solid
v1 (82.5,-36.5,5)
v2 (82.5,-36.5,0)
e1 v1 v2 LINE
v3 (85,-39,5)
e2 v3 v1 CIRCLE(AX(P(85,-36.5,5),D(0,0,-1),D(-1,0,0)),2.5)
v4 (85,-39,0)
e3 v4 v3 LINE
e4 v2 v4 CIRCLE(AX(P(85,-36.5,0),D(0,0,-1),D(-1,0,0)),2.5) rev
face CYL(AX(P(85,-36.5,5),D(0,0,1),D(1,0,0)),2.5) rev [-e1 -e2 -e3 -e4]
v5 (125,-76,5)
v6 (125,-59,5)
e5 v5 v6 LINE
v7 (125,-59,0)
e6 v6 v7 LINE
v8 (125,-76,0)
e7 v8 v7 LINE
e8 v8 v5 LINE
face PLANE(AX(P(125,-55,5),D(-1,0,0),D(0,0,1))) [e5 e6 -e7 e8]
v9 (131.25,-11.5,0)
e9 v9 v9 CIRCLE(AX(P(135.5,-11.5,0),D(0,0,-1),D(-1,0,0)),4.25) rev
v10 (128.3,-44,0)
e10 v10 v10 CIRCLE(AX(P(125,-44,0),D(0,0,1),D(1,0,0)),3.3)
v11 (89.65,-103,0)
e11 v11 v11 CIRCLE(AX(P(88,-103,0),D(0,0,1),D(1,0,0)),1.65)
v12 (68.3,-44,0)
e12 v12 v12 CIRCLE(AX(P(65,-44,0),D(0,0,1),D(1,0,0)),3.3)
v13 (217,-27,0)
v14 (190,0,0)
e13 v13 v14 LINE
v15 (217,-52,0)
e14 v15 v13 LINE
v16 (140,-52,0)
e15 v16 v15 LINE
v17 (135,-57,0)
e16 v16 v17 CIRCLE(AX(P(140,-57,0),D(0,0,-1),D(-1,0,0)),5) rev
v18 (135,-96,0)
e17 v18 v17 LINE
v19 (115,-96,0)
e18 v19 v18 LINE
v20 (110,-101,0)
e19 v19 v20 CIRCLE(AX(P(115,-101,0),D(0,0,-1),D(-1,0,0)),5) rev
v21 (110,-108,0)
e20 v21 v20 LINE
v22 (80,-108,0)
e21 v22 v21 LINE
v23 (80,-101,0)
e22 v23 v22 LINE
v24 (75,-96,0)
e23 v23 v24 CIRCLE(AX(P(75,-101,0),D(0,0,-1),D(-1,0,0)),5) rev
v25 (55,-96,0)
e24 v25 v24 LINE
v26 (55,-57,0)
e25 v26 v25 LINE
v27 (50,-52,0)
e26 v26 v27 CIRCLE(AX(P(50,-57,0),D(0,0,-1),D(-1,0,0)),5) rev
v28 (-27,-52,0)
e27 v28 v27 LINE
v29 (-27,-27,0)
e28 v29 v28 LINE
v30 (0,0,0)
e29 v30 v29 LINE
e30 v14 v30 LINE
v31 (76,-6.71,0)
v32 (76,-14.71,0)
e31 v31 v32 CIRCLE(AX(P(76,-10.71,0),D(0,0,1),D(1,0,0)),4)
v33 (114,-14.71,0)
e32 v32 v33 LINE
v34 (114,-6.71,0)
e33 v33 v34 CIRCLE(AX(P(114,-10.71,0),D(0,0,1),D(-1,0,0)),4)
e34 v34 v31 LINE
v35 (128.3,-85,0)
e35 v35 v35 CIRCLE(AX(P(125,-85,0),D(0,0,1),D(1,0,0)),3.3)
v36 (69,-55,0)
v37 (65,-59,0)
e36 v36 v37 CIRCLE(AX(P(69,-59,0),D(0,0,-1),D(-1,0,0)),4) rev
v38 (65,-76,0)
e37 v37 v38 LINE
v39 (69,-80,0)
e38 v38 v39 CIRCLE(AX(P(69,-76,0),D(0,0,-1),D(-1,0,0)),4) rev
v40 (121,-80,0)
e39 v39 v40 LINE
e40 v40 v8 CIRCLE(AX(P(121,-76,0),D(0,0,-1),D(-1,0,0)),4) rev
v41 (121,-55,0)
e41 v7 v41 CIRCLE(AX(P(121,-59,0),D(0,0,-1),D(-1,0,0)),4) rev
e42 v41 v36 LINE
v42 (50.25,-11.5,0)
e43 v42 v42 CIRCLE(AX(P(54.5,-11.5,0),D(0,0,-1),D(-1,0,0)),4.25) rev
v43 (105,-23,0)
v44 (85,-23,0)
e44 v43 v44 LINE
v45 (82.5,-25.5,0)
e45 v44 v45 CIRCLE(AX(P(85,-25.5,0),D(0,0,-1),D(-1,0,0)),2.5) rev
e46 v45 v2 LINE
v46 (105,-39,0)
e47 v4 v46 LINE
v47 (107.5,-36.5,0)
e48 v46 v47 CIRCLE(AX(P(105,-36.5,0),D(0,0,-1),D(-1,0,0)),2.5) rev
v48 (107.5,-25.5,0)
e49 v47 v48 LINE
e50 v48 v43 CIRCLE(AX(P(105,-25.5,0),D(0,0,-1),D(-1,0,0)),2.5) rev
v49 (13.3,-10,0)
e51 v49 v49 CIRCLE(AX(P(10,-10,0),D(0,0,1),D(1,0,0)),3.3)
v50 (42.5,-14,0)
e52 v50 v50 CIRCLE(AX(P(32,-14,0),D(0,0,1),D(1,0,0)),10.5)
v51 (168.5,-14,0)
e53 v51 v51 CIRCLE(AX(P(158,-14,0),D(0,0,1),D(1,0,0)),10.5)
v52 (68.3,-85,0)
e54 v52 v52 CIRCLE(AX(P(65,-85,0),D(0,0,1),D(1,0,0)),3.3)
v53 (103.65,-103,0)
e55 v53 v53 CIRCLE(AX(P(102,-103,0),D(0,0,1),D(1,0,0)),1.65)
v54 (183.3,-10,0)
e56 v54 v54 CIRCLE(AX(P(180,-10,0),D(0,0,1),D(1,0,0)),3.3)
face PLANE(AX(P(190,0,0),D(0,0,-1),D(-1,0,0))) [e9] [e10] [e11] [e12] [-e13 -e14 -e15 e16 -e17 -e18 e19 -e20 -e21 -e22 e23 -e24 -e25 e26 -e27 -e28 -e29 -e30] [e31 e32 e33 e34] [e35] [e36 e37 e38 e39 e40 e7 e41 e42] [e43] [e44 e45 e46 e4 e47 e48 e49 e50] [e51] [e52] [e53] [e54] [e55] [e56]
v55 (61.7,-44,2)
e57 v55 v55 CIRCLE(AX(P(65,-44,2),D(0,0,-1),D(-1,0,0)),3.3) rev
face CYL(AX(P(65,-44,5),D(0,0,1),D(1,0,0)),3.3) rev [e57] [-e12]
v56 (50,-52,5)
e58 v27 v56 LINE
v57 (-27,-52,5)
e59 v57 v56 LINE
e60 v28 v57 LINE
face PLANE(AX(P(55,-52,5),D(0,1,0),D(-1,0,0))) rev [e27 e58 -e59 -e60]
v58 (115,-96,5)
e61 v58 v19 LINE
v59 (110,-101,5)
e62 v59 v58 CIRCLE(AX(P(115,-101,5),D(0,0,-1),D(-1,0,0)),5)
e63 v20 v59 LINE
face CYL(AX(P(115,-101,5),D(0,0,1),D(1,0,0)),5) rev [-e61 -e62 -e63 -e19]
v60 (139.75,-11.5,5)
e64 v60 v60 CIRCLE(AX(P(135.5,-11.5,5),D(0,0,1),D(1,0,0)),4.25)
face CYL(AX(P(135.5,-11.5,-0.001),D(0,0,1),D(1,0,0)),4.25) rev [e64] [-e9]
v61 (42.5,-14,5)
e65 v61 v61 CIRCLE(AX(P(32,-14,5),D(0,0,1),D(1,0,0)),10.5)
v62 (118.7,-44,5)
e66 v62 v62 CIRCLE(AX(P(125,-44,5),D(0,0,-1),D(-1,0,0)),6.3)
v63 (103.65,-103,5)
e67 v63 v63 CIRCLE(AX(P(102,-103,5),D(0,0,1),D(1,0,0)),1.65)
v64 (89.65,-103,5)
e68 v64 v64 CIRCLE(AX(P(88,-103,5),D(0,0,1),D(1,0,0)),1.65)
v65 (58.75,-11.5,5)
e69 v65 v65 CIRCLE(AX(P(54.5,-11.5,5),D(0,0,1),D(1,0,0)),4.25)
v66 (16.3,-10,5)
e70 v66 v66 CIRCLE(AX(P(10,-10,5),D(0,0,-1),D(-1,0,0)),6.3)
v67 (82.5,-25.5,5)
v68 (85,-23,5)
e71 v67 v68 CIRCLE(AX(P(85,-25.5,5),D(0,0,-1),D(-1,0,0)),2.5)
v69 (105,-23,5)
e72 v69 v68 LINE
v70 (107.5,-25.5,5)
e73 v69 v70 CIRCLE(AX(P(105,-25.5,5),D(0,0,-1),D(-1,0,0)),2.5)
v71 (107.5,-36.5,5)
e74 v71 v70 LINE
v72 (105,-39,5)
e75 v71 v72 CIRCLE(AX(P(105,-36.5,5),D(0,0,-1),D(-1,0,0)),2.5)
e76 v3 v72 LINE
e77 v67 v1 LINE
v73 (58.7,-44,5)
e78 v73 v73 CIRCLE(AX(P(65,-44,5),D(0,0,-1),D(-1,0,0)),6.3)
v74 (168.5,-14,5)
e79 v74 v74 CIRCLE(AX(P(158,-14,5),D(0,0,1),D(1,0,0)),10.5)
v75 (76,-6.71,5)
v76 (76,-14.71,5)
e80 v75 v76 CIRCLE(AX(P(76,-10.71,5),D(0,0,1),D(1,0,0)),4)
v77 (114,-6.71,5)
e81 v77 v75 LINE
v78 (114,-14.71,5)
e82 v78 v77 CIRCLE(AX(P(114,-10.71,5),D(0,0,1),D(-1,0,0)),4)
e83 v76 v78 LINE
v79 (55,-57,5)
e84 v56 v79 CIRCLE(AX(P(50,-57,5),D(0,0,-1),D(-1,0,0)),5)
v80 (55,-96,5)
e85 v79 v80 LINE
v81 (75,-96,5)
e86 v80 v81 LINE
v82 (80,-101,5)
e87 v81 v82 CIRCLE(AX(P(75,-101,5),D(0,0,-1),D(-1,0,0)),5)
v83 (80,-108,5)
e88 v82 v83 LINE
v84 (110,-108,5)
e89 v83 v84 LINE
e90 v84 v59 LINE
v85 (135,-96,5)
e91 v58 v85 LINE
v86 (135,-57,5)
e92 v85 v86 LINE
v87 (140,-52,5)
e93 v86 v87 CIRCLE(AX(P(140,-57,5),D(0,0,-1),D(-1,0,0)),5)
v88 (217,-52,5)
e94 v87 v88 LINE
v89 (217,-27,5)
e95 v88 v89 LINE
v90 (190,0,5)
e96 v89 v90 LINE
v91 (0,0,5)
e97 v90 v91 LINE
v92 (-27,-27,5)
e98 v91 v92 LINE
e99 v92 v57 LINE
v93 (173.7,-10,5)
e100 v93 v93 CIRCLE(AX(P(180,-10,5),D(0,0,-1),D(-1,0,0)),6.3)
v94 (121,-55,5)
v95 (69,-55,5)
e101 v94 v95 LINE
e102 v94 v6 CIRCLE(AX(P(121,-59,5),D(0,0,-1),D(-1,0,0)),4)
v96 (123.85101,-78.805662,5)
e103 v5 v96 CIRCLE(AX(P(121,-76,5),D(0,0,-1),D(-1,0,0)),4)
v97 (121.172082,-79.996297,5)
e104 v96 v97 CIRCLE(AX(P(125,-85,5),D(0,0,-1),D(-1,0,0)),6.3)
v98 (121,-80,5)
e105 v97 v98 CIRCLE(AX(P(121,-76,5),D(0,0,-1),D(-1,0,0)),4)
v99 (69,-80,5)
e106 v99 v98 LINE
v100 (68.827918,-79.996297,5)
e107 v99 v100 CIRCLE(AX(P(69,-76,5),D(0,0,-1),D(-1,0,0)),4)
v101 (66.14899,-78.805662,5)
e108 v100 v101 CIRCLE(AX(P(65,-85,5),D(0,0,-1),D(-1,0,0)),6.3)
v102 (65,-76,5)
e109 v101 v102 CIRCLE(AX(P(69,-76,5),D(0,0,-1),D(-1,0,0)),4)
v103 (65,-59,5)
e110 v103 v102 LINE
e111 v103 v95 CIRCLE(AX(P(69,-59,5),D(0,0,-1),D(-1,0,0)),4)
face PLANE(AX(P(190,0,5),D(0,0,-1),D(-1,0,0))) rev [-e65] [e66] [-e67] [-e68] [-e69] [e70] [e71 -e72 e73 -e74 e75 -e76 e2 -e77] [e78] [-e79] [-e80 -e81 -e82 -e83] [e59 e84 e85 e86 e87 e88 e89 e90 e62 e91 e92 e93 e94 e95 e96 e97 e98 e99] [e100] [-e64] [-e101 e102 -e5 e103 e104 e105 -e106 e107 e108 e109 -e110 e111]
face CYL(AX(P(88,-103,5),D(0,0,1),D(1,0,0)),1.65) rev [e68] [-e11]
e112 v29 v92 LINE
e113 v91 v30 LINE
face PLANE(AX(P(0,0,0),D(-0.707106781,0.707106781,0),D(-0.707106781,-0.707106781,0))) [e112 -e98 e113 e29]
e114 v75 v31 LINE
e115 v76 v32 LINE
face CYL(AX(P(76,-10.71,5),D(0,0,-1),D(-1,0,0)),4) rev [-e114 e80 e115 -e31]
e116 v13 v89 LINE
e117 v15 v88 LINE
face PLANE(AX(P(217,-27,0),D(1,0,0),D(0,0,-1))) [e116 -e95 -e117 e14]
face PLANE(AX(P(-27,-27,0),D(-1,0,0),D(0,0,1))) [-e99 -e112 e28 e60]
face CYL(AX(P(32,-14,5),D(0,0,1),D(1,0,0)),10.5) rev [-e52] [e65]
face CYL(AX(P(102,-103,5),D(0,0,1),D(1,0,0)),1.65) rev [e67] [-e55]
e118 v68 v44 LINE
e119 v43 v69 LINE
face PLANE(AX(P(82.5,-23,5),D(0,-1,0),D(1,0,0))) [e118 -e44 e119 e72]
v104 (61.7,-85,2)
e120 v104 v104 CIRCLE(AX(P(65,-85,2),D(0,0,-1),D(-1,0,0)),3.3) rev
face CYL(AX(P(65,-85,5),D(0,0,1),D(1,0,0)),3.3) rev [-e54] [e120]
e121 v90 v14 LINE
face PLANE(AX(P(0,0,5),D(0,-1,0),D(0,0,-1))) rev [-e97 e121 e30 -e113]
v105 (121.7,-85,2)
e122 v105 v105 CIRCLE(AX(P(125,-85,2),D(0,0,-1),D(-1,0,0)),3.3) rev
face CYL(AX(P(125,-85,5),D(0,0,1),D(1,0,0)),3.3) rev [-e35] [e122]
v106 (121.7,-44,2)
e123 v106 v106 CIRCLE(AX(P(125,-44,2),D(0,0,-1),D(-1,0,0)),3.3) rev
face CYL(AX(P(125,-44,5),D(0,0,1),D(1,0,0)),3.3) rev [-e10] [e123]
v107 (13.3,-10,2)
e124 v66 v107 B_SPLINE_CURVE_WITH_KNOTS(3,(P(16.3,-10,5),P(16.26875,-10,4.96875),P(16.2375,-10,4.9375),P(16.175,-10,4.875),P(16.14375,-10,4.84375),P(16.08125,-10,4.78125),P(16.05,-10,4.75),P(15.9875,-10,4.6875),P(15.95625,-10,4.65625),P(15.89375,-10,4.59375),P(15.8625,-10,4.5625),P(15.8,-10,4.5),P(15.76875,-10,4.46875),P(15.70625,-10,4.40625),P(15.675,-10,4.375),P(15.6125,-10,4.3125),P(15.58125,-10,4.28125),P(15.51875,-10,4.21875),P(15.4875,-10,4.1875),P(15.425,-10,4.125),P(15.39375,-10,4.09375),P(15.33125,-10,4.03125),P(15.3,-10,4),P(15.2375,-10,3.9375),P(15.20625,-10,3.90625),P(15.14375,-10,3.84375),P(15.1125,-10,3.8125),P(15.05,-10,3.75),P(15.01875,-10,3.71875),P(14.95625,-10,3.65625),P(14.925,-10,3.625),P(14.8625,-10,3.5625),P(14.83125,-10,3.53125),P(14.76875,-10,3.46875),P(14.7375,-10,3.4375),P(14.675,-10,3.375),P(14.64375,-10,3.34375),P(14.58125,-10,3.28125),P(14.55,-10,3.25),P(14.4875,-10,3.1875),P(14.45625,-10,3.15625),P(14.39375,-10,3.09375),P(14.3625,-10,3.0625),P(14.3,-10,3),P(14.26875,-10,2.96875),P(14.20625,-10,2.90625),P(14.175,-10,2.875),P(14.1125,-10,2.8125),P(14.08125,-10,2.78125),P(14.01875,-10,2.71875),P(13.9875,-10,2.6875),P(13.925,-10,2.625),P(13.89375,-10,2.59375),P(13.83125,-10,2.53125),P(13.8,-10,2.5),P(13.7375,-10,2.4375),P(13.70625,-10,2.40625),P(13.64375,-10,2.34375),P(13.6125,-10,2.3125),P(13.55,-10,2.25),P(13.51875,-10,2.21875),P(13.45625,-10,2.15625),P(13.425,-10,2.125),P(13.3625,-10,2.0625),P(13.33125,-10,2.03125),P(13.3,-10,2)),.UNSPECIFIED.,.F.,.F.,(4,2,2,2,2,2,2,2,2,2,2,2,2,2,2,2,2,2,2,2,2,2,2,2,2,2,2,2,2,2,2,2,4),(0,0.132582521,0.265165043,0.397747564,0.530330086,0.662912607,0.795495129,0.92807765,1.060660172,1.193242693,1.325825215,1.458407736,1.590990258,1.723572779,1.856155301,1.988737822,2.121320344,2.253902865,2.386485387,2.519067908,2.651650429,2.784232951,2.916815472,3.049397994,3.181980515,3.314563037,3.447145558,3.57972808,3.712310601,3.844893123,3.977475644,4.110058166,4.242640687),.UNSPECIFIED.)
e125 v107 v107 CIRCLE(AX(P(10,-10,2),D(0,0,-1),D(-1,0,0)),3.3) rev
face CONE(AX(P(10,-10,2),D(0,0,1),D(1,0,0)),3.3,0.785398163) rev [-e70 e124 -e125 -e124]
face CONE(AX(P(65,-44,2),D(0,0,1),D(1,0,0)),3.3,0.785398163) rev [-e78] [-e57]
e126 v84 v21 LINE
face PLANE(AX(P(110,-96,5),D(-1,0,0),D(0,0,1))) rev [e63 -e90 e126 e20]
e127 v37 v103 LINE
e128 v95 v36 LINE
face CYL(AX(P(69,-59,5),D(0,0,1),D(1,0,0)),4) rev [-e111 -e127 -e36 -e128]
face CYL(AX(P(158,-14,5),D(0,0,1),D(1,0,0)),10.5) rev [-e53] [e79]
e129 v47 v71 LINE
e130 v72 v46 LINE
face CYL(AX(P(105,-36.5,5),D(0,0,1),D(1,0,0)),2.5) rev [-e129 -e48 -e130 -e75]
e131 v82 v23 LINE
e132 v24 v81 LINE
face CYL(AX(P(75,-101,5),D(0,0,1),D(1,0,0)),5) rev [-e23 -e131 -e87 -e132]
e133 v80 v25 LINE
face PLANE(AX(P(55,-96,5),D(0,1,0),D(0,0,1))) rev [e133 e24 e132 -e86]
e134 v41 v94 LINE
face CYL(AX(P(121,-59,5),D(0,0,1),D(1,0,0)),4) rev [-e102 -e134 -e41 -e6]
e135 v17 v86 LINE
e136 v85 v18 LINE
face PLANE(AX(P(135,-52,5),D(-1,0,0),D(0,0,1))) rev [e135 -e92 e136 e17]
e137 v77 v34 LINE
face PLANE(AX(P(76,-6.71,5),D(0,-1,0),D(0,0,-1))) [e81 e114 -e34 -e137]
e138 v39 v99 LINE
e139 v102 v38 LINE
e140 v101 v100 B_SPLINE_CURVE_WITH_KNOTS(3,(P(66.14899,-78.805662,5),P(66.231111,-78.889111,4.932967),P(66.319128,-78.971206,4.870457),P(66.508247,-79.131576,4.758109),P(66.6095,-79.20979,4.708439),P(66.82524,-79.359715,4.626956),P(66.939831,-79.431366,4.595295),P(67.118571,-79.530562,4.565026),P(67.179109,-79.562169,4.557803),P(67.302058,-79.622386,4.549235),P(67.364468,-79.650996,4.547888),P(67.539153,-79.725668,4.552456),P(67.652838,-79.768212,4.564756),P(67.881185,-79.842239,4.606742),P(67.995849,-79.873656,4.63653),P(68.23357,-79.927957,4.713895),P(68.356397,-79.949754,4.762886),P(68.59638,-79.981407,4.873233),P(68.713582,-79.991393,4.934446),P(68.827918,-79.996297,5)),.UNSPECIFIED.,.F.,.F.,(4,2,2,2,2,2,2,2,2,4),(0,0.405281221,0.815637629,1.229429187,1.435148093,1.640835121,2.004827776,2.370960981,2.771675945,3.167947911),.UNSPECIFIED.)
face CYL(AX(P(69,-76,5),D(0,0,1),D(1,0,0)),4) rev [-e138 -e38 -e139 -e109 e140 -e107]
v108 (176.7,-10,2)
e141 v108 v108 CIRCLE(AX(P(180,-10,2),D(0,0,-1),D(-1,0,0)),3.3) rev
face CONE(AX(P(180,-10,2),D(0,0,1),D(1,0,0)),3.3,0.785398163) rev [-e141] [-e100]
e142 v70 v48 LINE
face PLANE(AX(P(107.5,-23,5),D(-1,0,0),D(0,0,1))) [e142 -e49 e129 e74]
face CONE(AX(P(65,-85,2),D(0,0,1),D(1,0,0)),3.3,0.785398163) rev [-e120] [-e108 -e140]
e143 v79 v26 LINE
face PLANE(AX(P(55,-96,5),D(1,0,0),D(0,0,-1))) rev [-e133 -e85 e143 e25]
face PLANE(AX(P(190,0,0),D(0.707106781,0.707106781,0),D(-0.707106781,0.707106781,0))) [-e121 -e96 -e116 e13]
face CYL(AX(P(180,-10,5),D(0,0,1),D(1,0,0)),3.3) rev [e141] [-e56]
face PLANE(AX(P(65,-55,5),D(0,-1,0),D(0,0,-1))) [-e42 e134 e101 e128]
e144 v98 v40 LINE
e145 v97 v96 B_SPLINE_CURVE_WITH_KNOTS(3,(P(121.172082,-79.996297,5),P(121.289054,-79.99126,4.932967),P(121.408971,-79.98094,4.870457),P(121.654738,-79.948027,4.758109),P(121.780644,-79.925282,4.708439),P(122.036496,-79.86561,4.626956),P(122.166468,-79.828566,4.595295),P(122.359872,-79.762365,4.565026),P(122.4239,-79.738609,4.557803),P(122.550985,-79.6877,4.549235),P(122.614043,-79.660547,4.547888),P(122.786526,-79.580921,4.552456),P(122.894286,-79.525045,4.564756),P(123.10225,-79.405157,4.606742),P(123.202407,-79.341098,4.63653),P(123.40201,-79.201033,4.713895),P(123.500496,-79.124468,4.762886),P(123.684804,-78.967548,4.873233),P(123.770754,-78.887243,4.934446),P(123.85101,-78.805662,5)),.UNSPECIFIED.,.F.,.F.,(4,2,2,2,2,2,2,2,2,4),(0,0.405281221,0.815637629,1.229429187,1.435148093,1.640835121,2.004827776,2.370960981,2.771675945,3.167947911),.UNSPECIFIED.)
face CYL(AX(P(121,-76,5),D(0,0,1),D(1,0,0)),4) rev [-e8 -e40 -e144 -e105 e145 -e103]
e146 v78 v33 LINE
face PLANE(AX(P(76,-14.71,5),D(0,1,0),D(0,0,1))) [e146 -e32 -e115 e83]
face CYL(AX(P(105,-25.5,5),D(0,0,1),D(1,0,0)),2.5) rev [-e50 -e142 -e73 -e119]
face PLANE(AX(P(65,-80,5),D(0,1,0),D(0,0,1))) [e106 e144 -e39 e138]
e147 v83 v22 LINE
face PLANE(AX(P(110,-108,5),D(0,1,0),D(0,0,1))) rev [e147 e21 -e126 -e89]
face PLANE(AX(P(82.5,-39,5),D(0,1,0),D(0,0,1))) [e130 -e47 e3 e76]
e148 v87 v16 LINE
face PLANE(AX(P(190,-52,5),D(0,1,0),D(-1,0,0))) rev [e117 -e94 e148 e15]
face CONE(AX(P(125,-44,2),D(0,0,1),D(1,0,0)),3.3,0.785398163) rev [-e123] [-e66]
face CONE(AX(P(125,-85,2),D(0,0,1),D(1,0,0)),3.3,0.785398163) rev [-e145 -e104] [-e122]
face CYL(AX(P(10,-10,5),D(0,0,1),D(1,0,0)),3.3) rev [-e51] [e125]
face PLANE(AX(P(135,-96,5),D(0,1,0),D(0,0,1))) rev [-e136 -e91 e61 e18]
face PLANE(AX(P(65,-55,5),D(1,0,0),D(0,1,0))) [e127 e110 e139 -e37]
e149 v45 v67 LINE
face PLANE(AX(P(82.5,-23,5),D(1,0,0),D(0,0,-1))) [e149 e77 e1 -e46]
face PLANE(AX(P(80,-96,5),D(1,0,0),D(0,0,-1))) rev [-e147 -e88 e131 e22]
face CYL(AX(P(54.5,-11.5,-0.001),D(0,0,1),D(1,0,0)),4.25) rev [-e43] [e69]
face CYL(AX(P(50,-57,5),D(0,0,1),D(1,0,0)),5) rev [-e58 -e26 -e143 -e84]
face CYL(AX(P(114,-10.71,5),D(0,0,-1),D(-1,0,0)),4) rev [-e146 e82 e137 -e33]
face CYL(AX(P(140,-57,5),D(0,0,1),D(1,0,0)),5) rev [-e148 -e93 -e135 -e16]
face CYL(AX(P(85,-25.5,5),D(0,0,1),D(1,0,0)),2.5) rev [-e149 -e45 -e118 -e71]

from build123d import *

# Parameters (mm, degrees)
ESQUISSE1_W             = 25
ESQUISSE1_H             = 16
ESQUISSE1_W_2           = 60
ESQUISSE1_H_2           = 25
BOSS_EXTRU_1_DEPTH      = 5
CONG_1_R                = 2.5
CONG_2_R                = 4
CONG_3_R                = 5
D_GAGEMENT_M61_D        = 6.6
D_GAGEMENT_M201_D       = 21
ENL_V_MAT_EXTRU_1_REACH = 220.607
ESQUISSE11_R            = 4.25
BOSS_EXTRU_2_DEPTH      = 5
D_GAGEMENT_M62_D        = 6.6
D_GAGEMENT_M62_DEPTH    = 5
D_GAGEMENT_M62_TIP      = 1.982840043
CONG_4_R                = 5
TROU_TARAUD_M4X0_71_D   = 3.3
CHANFREIN1_SIZE         = 3


with BuildPart() as part:
    # Esquisse1 → Boss.-Extru.1 (new body)
    with BuildSketch(Plane.XY):
        Polygon((0, 0), (0, -52), (55, -52), (55, -96), (80, -96), (80, -108), (110, -108), (110, -96), (135, -96), (135, -52), (190, -52), (190, 0), align=None)
        with Locations((95, -31)):
            Rectangle(ESQUISSE1_W, ESQUISSE1_H, mode=Mode.SUBTRACT)
        with Locations((95, -67.5)):
            Rectangle(ESQUISSE1_W_2, ESQUISSE1_H_2, mode=Mode.SUBTRACT)
        with BuildLine():
            Line((76, -6.71), (114, -6.71))
            ThreePointArc((114, -6.71), (118, -10.71), (114, -14.71))
            Line((114, -14.71), (76, -14.71))
            ThreePointArc((76, -14.71), (72, -10.71), (76, -6.71))
        make_face(mode=Mode.SUBTRACT)
    extrude(amount=BOSS_EXTRU_1_DEPTH)

    # Congé1
    cong_1_edges = [part.edges().sort_by_distance(p)[0] for p in [
        (82.5, -23, 2.5),
        (82.5, -39, 2.5),
        (107.5, -39, 2.5),
        (107.5, -23, 2.5),
    ]]
    fillet(cong_1_edges, radius=CONG_1_R)

    # Congé2
    cong_2_edges = [part.edges().sort_by_distance(p)[0] for p in [
        (65, -55, 2.5),
        (65, -80, 2.5),
        (125, -80, 2.5),
        (125, -55, 2.5),
    ]]
    fillet(cong_2_edges, radius=CONG_2_R)

    # Congé3
    cong_3_edges = [part.edges().sort_by_distance(p)[0] for p in [
        (135, -52, 2.5),
        (55, -52, 2.5),
    ]]
    fillet(cong_3_edges, radius=CONG_3_R)

    # Dégagement M61 (through all)
    with Locations(Plane.XY.offset(5)):
        with Locations((10, -10), (180, -10)):
            Hole(D_GAGEMENT_M61_D / 2)

    # Dégagement M201 (through all)
    with Locations(Plane.XY.offset(5)):
        with Locations((32, -14), (158, -14)):
            Hole(D_GAGEMENT_M201_D / 2)

    # Esquisse11 → Enlèv. mat.-Extru.1 (cut, up to next)
    with BuildSketch(Plane.XY.offset(5), mode=Mode.PRIVATE) as enl_v_mat_extru_1_sk1:
        with Locations((54.5, -11.5)):
            Circle(ESQUISSE11_R)
    enl_v_mat_extru_1_tool1 = extrude(enl_v_mat_extru_1_sk1.sketch, amount=-ENL_V_MAT_EXTRU_1_REACH, mode=Mode.PRIVATE) & part.part
    # Esquisse11 → Enlèv. mat.-Extru.1 (cut, up to next)
    with BuildSketch(Plane.XY.offset(5), mode=Mode.PRIVATE) as enl_v_mat_extru_1_sk2:
        with Locations((135.5, -11.5)):
            Circle(ESQUISSE11_R)
    enl_v_mat_extru_1_tool2 = extrude(enl_v_mat_extru_1_sk2.sketch, amount=-ENL_V_MAT_EXTRU_1_REACH, mode=Mode.PRIVATE) & part.part
    add(enl_v_mat_extru_1_tool1.solids().sort_by_distance((54.5, -11.5, 5))[0], mode=Mode.SUBTRACT)
    add(enl_v_mat_extru_1_tool2.solids().sort_by_distance((135.5, -11.5, 5))[0], mode=Mode.SUBTRACT)

    # Esquisse13 → Boss.-Extru.2 (add)
    with BuildSketch(Plane.XY.offset(5)):
        Polygon((0, 0), (-27, -27), (-27, -52), (0, -52), align=None)
        Polygon((217, -52), (190, -52), (190, 0), (217, -27), align=None)
    extrude(amount=-BOSS_EXTRU_2_DEPTH)

    # Dégagement M62
    with Locations(Plane.XY.offset(5)):
        with Locations((65, -44), (125, -44), (125, -85), (65, -85)):
            Hole(D_GAGEMENT_M62_D / 2, depth=D_GAGEMENT_M62_DEPTH)
            with Locations((0, 0, -(D_GAGEMENT_M62_DEPTH + D_GAGEMENT_M62_TIP / 2))):  # 118° drill point
                Cone(0, D_GAGEMENT_M62_D / 2, D_GAGEMENT_M62_TIP, mode=Mode.SUBTRACT)

    # Congé4
    cong_4_edges = [part.edges().sort_by_distance(p)[0] for p in [
        (110, -96, 2.5),
        (80, -96, 2.5),
    ]]
    fillet(cong_4_edges, radius=CONG_4_R)

    # Trou taraudé M4x0.71 (through all)
    with Locations(Plane.XY.offset(5)):
        with Locations((88, -103), (102, -103)):
            Hole(TROU_TARAUD_M4X0_71_D / 2)

    # Chanfrein1
    # the kernel refuses this chamfer: 3 mm, written as the material it takes off along each edge
    with BuildSketch(Plane(origin=(180, -10, 5), x_dir=(-1, 0, 0), z_dir=(0, -1, 0))) as chanfrein1_piece_1:
        Polygon((3.3, CHANFREIN1_SIZE), (3.3 + CHANFREIN1_SIZE, 0), (3.3, 0), align=None)
    revolve(axis=Axis((180, -10, 5), (0, 0, -1)), mode=Mode.SUBTRACT)
    with BuildSketch(Plane(origin=(10, -10, 5), x_dir=(-1, 0, 0), z_dir=(0, -1, 0))) as chanfrein1_piece_2:
        Polygon((3.3, CHANFREIN1_SIZE), (3.3 + CHANFREIN1_SIZE, 0), (3.3, 0), align=None)
    revolve(axis=Axis((10, -10, 5), (0, 0, -1)), mode=Mode.SUBTRACT)
    with BuildSketch(Plane(origin=(65, -85, 5), x_dir=(-1, 0, 0), z_dir=(0, -1, 0))) as chanfrein1_piece_3:
        Polygon((3.3, CHANFREIN1_SIZE), (3.3 + CHANFREIN1_SIZE, 0), (3.3, 0), align=None)
    revolve(axis=Axis((65, -85, 5), (0, 0, -1)), mode=Mode.SUBTRACT)
    with BuildSketch(Plane(origin=(125, -85, 5), x_dir=(-1, 0, 0), z_dir=(0, -1, 0))) as chanfrein1_piece_4:
        Polygon((3.3, CHANFREIN1_SIZE), (3.3 + CHANFREIN1_SIZE, 0), (3.3, 0), align=None)
    revolve(axis=Axis((125, -85, 5), (0, 0, -1)), mode=Mode.SUBTRACT)
    with BuildSketch(Plane(origin=(125, -44, 5), x_dir=(-1, 0, 0), z_dir=(0, -1, 0))) as chanfrein1_piece_5:
        Polygon((3.3, CHANFREIN1_SIZE), (3.3 + CHANFREIN1_SIZE, 0), (3.3, 0), align=None)
    revolve(axis=Axis((125, -44, 5), (0, 0, -1)), mode=Mode.SUBTRACT)
    with BuildSketch(Plane(origin=(65, -44, 5), x_dir=(-1, 0, 0), z_dir=(0, -1, 0))) as chanfrein1_piece_6:
        Polygon((3.3, CHANFREIN1_SIZE), (3.3 + CHANFREIN1_SIZE, 0), (3.3, 0), align=None)
    revolve(axis=Axis((65, -44, 5), (0, 0, -1)), mode=Mode.SUBTRACT)


solid = part.part
